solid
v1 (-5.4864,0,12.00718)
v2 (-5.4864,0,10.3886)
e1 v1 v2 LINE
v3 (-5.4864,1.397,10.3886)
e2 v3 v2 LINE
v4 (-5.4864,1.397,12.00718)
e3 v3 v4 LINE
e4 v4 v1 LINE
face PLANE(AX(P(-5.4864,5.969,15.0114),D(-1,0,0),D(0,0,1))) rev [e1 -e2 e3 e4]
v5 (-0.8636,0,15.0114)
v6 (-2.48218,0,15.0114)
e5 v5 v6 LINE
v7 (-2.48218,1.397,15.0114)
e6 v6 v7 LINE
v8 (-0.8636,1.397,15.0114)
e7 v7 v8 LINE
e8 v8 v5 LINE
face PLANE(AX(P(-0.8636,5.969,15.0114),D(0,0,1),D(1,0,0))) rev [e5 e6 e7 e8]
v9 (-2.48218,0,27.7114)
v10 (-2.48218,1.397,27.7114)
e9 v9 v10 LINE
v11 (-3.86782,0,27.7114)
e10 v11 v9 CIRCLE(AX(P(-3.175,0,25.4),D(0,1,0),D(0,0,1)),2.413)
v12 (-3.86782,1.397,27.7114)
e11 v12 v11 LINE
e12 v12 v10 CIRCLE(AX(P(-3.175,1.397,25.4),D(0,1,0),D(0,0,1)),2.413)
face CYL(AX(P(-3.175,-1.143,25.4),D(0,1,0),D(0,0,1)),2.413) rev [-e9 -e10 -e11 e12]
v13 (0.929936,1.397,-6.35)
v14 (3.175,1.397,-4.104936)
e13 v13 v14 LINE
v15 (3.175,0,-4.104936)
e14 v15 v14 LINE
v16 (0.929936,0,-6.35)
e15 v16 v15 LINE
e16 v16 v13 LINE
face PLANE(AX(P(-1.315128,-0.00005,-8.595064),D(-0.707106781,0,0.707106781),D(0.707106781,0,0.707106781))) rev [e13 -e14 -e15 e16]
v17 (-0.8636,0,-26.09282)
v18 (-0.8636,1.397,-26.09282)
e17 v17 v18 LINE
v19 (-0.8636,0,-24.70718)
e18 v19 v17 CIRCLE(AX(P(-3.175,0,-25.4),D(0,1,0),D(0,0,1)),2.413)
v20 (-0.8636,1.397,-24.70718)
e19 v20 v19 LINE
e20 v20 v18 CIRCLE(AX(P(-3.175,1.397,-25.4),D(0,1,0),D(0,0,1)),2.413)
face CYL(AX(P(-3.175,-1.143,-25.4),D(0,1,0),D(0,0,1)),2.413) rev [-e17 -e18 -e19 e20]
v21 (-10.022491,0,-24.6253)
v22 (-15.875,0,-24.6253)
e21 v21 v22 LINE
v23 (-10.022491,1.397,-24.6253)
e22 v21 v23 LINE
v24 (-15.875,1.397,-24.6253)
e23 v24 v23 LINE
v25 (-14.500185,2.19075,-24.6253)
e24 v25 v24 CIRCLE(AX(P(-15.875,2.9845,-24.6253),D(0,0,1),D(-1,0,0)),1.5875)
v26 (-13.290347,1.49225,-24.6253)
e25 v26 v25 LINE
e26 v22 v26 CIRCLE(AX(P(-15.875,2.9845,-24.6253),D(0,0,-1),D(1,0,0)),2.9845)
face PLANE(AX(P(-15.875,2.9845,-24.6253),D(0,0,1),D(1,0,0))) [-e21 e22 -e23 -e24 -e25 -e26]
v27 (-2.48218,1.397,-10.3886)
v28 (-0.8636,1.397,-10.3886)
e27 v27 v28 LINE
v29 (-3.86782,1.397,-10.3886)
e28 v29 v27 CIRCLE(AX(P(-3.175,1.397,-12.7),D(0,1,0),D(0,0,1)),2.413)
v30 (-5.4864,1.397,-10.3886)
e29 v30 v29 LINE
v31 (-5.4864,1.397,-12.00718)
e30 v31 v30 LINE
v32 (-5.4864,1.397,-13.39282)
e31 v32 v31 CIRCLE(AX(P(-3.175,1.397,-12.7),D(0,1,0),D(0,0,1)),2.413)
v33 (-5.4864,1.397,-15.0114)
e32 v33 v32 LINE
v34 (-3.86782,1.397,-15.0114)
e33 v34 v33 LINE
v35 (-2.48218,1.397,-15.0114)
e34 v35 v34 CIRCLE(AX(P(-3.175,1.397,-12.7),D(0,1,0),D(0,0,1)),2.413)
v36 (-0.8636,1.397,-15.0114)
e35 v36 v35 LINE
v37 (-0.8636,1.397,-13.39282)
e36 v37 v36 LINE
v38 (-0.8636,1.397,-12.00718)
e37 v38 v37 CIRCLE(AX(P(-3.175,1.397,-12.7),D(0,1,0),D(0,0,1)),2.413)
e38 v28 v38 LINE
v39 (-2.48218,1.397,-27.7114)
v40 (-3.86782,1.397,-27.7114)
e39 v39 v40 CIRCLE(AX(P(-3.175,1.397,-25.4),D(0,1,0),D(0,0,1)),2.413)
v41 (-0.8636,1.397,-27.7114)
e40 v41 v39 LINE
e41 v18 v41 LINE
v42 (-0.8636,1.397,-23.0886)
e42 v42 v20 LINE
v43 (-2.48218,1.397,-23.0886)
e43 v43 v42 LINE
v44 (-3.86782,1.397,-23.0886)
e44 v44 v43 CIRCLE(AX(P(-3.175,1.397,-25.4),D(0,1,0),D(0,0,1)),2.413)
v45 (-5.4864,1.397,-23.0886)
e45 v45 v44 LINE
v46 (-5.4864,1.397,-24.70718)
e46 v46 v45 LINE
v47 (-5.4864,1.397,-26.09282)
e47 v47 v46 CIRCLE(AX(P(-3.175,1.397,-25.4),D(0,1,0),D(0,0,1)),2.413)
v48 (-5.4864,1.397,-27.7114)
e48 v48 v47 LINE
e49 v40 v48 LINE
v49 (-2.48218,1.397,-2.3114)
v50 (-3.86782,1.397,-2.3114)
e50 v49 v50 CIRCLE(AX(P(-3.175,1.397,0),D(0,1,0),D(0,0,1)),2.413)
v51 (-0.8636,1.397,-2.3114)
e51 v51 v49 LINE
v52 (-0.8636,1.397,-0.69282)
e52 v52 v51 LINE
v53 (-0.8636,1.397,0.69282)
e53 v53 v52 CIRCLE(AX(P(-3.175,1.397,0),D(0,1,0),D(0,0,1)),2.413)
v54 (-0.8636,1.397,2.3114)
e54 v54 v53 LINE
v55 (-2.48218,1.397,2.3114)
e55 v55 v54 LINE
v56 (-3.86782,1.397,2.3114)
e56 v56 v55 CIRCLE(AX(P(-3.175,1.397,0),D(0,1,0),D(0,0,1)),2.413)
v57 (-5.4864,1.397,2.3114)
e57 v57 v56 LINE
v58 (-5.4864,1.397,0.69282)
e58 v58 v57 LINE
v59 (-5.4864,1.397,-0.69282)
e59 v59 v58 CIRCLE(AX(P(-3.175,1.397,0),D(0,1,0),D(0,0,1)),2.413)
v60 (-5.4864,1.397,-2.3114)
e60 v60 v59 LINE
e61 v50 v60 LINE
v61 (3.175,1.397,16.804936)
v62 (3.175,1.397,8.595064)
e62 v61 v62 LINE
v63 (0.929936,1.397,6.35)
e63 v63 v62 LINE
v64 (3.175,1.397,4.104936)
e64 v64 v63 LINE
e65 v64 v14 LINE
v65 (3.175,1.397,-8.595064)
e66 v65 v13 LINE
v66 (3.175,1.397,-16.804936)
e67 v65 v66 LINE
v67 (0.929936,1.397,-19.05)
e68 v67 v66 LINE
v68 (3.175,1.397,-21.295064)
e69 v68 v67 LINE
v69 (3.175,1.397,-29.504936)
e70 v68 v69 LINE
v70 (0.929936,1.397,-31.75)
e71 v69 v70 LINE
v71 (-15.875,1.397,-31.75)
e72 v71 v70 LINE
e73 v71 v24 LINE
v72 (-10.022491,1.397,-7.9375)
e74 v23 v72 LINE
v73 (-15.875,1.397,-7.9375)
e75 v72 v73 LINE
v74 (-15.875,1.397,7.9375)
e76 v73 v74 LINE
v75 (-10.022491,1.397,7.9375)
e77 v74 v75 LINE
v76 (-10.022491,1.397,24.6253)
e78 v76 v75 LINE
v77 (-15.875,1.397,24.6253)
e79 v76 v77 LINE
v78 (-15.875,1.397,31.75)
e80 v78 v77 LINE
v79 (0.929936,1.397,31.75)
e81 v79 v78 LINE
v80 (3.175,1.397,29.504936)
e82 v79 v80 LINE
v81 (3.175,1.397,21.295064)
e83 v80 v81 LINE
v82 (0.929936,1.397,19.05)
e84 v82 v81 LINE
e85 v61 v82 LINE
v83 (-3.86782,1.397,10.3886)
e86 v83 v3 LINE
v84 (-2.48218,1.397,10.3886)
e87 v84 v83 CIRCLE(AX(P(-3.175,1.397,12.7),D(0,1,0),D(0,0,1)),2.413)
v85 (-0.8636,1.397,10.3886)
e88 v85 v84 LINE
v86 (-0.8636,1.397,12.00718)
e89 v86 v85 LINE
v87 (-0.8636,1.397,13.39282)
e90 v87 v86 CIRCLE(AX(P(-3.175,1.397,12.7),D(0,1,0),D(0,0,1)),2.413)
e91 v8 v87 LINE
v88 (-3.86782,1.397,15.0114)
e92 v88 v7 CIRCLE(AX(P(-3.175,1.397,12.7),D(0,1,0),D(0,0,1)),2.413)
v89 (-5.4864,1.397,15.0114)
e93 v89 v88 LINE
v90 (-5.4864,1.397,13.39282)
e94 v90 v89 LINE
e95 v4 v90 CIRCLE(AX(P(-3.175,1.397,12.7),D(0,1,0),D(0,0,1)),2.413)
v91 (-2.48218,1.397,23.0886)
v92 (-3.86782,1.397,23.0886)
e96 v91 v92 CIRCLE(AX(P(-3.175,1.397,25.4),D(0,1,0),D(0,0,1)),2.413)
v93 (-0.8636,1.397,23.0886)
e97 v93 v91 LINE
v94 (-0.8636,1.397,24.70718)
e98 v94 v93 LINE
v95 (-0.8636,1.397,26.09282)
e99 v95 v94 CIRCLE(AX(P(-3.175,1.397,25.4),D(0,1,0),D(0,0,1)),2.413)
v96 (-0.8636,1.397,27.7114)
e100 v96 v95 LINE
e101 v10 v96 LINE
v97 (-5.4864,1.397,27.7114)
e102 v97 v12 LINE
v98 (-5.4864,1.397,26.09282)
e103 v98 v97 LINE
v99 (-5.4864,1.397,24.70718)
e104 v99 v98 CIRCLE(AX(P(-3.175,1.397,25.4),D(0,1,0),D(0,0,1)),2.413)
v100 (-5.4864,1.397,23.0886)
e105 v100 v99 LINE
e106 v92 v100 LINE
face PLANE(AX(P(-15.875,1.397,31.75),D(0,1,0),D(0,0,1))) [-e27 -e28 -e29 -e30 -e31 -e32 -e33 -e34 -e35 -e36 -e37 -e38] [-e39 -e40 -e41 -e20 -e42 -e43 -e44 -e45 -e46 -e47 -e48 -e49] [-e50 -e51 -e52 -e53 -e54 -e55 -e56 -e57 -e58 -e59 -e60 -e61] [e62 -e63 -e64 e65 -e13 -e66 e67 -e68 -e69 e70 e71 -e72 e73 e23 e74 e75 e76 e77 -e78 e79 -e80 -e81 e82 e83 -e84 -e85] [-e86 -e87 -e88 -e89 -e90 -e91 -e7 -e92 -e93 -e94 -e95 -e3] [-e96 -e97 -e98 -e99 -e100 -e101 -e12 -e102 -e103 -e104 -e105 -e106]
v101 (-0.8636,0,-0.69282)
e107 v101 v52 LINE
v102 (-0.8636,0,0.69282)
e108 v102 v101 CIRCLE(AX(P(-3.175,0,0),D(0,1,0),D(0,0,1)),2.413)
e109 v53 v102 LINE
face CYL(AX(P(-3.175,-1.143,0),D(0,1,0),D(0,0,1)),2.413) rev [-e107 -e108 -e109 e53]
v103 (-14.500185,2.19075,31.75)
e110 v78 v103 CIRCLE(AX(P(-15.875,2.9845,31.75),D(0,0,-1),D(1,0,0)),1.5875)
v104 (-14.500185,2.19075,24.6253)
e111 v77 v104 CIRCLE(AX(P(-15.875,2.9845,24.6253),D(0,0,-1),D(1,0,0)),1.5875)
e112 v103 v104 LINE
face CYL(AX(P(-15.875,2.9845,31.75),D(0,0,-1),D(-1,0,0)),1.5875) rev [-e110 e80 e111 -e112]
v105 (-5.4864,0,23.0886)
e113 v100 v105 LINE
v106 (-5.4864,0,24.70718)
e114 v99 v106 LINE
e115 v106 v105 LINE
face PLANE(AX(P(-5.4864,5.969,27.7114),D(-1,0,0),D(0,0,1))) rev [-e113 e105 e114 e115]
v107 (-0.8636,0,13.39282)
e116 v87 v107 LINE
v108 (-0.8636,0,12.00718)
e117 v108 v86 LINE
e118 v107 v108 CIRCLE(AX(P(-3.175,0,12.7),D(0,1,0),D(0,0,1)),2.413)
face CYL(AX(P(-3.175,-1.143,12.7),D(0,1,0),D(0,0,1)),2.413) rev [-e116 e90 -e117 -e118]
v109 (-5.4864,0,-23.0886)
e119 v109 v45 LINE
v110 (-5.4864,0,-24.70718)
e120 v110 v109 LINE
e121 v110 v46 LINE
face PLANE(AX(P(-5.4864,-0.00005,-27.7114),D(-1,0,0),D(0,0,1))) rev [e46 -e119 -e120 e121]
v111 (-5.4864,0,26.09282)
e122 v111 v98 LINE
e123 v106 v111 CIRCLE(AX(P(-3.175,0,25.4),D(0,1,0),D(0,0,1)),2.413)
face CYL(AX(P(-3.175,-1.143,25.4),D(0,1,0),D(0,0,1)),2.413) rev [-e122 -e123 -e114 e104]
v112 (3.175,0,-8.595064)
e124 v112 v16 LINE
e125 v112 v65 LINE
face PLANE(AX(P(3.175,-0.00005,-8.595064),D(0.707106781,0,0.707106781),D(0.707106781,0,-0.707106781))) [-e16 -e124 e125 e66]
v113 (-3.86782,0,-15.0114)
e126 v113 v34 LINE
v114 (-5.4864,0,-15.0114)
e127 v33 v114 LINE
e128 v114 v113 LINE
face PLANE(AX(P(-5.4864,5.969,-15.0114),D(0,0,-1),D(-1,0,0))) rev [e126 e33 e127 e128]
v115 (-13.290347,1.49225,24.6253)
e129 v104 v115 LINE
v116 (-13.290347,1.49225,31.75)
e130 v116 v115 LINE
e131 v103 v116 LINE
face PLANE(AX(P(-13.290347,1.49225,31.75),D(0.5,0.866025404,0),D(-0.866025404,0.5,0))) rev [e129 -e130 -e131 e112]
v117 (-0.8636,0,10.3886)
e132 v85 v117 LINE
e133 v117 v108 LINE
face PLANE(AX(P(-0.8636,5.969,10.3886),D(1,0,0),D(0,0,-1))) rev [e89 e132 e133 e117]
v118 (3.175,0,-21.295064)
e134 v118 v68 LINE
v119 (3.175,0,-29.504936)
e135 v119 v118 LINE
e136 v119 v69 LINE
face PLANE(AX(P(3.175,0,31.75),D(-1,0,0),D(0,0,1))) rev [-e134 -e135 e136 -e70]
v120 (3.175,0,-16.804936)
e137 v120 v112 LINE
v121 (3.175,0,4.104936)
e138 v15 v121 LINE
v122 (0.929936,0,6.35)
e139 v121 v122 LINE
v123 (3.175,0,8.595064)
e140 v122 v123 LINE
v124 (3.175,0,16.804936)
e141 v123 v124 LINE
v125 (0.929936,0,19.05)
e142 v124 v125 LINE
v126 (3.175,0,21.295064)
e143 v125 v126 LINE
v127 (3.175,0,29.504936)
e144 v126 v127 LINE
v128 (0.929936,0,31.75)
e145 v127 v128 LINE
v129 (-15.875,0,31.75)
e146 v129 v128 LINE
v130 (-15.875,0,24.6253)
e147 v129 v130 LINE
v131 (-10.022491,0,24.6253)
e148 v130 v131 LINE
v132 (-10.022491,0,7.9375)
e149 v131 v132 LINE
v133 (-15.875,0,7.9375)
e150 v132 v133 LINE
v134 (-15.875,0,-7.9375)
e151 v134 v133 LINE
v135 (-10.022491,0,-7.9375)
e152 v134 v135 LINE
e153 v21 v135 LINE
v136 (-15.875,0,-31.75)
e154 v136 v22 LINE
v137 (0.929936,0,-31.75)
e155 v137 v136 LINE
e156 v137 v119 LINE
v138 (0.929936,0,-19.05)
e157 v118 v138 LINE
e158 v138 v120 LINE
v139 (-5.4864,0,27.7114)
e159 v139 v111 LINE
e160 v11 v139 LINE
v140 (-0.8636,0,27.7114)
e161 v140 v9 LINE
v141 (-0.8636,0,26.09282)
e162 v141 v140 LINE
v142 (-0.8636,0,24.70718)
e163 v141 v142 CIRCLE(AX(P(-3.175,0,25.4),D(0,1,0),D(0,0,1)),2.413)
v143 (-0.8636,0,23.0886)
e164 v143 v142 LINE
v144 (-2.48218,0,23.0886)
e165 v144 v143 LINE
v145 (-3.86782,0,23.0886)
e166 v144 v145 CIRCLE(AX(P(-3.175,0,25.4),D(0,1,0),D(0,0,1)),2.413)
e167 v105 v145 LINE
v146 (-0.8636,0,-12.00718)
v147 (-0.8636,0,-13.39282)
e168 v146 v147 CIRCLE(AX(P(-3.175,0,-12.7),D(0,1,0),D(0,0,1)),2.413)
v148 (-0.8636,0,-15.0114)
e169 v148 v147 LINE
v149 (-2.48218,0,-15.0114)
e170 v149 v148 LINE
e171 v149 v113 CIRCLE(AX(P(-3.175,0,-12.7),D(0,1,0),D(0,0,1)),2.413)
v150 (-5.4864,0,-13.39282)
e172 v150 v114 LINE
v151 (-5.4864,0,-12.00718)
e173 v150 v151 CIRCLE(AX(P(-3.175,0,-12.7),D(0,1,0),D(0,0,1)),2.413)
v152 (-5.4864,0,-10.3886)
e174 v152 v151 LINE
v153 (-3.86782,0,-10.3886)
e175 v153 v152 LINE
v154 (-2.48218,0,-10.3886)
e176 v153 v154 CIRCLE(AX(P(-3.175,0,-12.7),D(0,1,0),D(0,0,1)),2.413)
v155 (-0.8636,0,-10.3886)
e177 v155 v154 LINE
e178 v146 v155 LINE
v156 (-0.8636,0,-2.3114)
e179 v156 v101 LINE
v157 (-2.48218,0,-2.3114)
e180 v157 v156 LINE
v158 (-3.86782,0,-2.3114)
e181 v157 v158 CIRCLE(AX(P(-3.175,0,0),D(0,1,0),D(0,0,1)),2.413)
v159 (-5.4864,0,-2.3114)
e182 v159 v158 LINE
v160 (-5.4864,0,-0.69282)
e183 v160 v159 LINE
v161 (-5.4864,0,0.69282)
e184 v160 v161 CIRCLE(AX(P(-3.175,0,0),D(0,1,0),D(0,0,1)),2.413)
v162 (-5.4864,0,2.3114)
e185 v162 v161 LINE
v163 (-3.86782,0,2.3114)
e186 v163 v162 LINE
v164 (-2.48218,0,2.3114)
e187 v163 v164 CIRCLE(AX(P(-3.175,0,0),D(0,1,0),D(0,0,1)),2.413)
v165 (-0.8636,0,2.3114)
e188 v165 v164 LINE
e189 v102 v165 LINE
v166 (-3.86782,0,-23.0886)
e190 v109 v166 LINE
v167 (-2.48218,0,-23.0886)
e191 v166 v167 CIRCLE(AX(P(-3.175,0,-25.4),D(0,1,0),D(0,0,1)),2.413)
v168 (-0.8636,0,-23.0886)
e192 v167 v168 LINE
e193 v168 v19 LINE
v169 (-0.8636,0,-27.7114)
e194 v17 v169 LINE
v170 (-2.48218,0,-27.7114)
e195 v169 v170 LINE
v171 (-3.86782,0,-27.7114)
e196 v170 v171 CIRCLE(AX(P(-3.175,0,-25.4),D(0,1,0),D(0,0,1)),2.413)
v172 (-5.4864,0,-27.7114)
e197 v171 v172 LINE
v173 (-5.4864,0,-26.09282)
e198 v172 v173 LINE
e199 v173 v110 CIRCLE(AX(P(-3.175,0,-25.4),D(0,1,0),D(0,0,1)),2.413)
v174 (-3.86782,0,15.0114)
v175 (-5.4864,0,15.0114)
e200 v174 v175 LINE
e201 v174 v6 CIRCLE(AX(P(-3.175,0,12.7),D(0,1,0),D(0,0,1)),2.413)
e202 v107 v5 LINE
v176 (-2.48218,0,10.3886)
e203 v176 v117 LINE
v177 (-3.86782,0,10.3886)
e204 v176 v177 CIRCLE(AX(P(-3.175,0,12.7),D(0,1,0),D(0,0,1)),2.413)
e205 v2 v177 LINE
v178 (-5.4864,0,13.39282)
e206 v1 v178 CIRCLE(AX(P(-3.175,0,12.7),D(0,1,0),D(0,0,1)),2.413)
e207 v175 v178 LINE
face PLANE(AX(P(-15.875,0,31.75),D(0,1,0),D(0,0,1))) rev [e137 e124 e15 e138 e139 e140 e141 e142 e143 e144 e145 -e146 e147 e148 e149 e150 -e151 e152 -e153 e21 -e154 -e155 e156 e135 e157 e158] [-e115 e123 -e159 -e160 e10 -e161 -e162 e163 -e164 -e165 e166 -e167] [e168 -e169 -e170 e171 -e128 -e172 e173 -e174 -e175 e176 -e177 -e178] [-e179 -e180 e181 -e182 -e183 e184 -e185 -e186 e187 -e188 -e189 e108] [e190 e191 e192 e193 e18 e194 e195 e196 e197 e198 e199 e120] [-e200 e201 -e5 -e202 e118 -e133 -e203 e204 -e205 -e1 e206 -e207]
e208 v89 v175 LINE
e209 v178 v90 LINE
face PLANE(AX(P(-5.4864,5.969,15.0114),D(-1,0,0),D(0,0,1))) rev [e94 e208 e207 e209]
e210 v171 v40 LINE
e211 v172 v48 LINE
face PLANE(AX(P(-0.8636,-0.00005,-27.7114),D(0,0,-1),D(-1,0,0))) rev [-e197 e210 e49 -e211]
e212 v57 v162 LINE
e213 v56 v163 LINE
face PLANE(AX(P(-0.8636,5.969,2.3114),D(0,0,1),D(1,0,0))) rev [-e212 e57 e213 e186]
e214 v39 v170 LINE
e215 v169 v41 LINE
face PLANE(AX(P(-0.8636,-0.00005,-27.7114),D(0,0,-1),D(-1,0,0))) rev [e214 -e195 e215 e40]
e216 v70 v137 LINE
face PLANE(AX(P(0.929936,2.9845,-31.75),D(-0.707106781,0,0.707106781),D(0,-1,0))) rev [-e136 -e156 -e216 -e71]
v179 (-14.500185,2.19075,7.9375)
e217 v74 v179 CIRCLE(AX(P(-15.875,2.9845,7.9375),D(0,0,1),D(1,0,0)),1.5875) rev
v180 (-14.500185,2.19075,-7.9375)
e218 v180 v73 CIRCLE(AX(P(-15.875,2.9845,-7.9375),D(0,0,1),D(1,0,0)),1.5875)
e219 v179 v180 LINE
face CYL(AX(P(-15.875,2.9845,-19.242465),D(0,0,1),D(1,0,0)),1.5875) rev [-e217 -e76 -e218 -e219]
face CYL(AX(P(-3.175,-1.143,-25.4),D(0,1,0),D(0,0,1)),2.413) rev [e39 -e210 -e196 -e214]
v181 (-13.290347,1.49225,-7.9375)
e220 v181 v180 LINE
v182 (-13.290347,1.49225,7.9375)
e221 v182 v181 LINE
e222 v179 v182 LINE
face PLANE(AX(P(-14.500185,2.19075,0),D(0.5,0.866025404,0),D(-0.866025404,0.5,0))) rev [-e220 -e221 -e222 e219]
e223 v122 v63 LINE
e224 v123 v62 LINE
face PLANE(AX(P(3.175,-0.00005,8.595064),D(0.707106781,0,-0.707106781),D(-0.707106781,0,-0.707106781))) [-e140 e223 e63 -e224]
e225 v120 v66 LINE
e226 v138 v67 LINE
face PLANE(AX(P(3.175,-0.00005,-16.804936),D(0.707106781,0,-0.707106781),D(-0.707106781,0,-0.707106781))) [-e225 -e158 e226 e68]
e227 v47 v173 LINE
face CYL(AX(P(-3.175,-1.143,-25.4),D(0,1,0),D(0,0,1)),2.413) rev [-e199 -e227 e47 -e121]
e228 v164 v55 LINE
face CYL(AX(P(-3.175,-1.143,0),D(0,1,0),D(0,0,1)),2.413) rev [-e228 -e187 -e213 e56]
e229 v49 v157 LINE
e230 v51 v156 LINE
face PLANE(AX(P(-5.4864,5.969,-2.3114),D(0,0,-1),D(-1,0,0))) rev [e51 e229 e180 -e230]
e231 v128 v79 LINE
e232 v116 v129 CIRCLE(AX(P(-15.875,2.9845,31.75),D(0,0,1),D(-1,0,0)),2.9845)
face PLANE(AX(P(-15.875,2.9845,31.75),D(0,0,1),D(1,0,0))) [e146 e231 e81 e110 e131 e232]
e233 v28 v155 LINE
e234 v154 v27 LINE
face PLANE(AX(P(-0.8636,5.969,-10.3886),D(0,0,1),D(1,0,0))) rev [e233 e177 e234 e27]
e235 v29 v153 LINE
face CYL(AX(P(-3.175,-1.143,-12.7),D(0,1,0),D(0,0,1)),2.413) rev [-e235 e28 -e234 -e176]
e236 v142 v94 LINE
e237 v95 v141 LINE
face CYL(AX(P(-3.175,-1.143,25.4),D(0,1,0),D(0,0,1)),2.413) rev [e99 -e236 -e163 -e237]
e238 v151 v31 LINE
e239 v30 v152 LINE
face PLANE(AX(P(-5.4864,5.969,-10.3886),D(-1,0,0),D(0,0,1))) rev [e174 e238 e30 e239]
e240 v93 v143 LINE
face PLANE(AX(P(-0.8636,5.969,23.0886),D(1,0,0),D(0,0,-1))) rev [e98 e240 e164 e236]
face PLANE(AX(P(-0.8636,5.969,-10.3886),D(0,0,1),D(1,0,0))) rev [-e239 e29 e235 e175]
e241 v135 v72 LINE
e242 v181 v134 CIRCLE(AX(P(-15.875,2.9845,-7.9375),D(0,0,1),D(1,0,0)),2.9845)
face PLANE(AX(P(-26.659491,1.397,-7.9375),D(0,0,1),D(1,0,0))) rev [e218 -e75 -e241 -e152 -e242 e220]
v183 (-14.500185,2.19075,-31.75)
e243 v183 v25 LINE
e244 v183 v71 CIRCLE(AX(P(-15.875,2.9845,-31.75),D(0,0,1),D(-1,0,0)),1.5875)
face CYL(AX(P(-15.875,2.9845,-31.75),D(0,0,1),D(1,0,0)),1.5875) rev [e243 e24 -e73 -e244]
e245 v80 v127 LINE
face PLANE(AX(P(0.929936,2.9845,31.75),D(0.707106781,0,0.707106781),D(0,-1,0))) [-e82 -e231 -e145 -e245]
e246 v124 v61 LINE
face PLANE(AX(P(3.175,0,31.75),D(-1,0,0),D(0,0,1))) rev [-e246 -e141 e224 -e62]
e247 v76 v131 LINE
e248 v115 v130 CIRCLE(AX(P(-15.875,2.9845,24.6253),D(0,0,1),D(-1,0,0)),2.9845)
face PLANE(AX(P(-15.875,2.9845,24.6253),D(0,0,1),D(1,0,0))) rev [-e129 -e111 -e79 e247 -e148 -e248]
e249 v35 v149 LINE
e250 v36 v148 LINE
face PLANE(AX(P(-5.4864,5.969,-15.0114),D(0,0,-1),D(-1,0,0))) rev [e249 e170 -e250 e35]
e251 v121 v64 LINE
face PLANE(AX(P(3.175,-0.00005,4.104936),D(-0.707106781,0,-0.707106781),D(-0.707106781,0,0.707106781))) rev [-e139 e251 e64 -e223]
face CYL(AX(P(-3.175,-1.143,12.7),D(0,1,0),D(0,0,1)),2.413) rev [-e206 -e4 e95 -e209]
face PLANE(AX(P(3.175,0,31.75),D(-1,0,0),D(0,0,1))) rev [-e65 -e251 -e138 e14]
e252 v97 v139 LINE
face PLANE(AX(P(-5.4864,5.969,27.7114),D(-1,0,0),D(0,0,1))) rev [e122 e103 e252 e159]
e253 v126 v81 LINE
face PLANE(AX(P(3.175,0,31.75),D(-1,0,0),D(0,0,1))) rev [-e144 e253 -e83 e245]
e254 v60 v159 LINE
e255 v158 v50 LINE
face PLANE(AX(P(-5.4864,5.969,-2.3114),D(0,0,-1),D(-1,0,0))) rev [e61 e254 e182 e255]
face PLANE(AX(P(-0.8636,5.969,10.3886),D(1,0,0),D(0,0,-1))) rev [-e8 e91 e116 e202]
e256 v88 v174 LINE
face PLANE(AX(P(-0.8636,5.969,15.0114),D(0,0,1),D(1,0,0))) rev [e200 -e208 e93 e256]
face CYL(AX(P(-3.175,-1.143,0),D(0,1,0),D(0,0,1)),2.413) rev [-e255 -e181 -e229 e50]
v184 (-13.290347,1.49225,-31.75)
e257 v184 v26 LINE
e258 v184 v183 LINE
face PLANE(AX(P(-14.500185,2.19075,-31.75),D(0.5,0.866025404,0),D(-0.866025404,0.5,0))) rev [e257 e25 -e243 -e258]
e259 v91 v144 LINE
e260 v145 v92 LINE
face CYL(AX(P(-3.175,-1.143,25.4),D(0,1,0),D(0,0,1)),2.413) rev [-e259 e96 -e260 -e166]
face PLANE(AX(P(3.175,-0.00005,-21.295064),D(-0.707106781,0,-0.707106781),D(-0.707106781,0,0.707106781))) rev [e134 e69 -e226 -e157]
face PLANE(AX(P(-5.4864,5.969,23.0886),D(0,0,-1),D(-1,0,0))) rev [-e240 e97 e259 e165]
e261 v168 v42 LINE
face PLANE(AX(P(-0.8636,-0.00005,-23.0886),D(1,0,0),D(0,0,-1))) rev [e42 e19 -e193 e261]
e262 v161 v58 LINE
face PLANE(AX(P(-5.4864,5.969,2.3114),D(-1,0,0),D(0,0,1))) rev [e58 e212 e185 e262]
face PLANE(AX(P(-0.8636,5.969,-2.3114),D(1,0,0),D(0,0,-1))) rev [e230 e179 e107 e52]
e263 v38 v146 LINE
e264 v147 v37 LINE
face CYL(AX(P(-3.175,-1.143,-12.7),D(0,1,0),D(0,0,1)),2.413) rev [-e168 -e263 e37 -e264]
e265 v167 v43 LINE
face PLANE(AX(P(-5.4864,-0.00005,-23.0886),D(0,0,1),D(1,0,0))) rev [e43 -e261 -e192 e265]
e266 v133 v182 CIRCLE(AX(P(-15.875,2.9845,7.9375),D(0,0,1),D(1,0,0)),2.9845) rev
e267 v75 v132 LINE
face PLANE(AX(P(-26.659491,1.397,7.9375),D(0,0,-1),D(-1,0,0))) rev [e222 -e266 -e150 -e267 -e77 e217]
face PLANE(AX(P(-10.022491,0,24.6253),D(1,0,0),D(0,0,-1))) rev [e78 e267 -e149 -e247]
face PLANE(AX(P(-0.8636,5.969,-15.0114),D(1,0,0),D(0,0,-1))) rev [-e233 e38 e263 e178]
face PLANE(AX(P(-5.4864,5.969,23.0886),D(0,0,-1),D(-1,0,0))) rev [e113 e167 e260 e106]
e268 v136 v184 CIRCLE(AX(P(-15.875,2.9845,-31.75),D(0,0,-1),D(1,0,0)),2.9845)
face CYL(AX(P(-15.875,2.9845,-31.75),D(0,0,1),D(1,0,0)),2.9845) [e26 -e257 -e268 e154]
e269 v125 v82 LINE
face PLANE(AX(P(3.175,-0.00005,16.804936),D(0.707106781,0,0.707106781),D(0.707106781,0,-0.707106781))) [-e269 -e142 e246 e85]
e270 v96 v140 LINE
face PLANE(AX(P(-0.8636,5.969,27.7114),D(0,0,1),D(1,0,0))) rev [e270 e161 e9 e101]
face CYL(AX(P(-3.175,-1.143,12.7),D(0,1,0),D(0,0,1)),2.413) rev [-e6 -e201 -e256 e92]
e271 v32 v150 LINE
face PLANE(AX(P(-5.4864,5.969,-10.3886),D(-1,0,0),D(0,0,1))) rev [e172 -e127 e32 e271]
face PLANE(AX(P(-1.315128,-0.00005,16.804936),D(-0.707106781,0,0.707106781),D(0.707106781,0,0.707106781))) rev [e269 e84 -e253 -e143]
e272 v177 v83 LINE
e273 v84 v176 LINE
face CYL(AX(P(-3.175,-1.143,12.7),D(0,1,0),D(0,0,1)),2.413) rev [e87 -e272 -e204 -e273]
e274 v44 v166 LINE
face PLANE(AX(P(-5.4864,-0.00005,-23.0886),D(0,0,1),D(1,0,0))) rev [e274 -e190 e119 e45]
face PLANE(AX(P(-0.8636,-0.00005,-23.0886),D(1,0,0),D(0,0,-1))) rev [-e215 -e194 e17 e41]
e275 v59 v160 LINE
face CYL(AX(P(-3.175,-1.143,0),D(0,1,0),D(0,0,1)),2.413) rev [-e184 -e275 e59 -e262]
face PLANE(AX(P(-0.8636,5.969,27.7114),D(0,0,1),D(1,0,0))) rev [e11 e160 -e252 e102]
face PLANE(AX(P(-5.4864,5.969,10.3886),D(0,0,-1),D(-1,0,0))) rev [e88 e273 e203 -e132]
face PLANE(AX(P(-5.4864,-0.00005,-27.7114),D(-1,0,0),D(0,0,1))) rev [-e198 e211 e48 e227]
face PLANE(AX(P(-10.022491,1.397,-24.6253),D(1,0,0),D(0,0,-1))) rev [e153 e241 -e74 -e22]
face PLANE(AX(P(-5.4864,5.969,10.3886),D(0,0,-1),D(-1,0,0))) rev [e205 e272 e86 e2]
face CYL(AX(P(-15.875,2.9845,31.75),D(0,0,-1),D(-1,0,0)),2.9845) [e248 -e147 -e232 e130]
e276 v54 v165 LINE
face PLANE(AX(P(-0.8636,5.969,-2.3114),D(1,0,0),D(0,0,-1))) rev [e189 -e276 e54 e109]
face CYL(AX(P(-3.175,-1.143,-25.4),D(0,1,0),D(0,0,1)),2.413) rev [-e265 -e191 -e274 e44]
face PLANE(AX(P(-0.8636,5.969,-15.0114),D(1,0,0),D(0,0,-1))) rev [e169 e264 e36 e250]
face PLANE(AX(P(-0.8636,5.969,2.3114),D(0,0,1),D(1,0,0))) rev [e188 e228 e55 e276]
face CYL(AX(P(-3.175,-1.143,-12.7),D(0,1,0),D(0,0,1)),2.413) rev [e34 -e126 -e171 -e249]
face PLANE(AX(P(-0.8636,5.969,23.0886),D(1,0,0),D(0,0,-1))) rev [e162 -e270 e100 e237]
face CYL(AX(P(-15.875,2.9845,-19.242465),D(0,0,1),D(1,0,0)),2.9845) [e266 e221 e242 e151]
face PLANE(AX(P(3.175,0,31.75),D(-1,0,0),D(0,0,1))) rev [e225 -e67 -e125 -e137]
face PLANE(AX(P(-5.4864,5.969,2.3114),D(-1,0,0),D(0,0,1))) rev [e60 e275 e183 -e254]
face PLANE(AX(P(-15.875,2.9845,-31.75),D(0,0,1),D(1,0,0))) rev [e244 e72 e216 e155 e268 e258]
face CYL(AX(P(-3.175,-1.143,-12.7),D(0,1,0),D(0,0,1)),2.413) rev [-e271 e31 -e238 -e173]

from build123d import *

# Parameters (mm, degrees)
BOSS_EXTRUDE1_START       = -15.875
BOSS_EXTRUDE1_DEPTH       = 15.875
BOSS_EXTRUDE1_2_OUTLINE_W = 13.197490677
BOSS_EXTRUDE1_2_OUTLINE_H = 1.397
BOSS_EXTRUDE1_2_DEPTH     = 16.6878
SKETCH2_W                 = 13.197490677
SKETCH2_H                 = 1.397
BOSS_EXTRUDE2_DEPTH       = 16.6878
BOSS_EXTRUDE3_START       = 7.1247
BOSS_EXTRUDE3_DEPTH       = 7.1247
BOSS_EXTRUDE4_DEPTH       = 7.1247
CUT_EXTRUDE1_DEPTH        = 38.210837465
CUT_EXTRUDE2_DEPTH        = 38.210837465
CUT_EXTRUDE3_DEPTH        = 38.210837465
CUT_EXTRUDE4_DEPTH        = 38.210837465
SKETCH9_W                 = 4.6228
SKETCH9_H                 = 4.6228
CUT_EXTRUDE5_DEPTH        = 38.408183622
SKETCH10_W                = 4.6228
SKETCH10_H                = 4.6228
CUT_EXTRUDE6_DEPTH        = 38.408183622
SKETCH11_W                = 4.6228
SKETCH11_H                = 4.6228
CUT_EXTRUDE7_DEPTH        = 38.408183622
SKETCH12_W                = 4.6228
SKETCH12_H                = 4.6228
CUT_EXTRUDE8_DEPTH        = 38.408183622
SKETCH13_W                = 4.6228
SKETCH13_H                = 4.6228
CUT_EXTRUDE9_DEPTH        = 38.210837465
DRAFT1_DEPTH              = 1.397
DRAFT2_DEPTH              = 1.397
CHAMFER1_SIZE             = 2.24506403
SKETCH14_R                = 2.413
CUT_EXTRUDE10_DEPTH       = 2.54
LPATTERN1_COUNT           = 5
LPATTERN1_PITCH           = 12.7


with BuildPart() as part:
    # Boss-Extrude1: read off the stored shape, not the designer's step
    # Boss-Extrude1 outline → Boss-Extrude1 (new body)
    with BuildSketch(Plane.XY.offset(7.9375).offset(BOSS_EXTRUDE1_START)):
        with BuildLine():
            Line((-14.500184662, 2.190749994), (-13.290347173, 1.492249994))
            ThreePointArc((-13.290347173, 1.492249994), (-17.367250005, 5.569152828), (-15.875, -1.1e-08))
            Line((-15.875, -1.1e-08), (3.175, 0))
            Line((3.175, 0), (3.175, 1.397))
            Line((3.175, 1.397), (-15.875, 1.396999989))
            ThreePointArc((-15.875, 1.396999989), (-16.668750005, 4.359315339), (-14.500184662, 2.190749994))
        make_face()
    extrude(amount=BOSS_EXTRUDE1_DEPTH)

    # Boss-Extrude1 2 outline → Boss-Extrude1 2 (add)
    with BuildSketch(Plane.XY.offset(7.9375)):
        with Locations((-3.423745338, 0.6985)):
            Rectangle(BOSS_EXTRUDE1_2_OUTLINE_W, BOSS_EXTRUDE1_2_OUTLINE_H)
    extrude(amount=BOSS_EXTRUDE1_2_DEPTH)

    # Sketch2 → Boss-Extrude2 (add)
    with BuildSketch(Plane(origin=(0, 0, -7.9375), x_dir=(-1, 0, 0), z_dir=(0, 0, -1))):
        with Locations((3.423745338, 0.6985)):
            Rectangle(SKETCH2_W, SKETCH2_H)
    extrude(amount=BOSS_EXTRUDE2_DEPTH)

    # Sketch3 → Boss-Extrude3 (add)
    with BuildSketch(Plane(origin=(0, 0, -24.6253), x_dir=(-1, 0, 0), z_dir=(0, 0, -1)).offset(BOSS_EXTRUDE3_START)):
        with BuildLine():
            Line((15.875, 0), (-3.175, 0))
            Line((-3.175, 0), (-3.175, 1.397))
            Line((-3.175, 1.397), (15.875, 1.397))
            ThreePointArc((15.875, 1.397), (16.668750004, 4.359315344), (14.500184664, 2.190750004))
            Line((14.500184664, 2.190750004), (13.290347175, 1.492250004))
            ThreePointArc((13.290347175, 1.492250004), (17.367250004, 5.569152833), (15.875, 0))
        make_face()
    extrude(amount=-BOSS_EXTRUDE3_DEPTH)

    # Sketch4 → Boss-Extrude4 (add)
    with BuildSketch(Plane.XY.offset(24.6253)):
        with BuildLine():
            Line((-15.875, 1.396999994), (3.175, 1.396999994))
            Line((3.175, 1.396999994), (3.175, -6e-09))
            Line((3.175, -6e-09), (-15.875, -6e-09))
            ThreePointArc((-15.875, -6e-09), (-17.367250004, 5.569152828), (-13.290347175, 1.492249999))
            Line((-13.290347175, 1.492249999), (-14.500184664, 2.190749999))
            ThreePointArc((-14.500184664, 2.190749999), (-16.668750004, 4.359315339), (-15.875, 1.396999994))
        make_face()
    extrude(amount=BOSS_EXTRUDE4_DEPTH)

    # Sketch5 → Cut-Extrude1 (cut, through all)
    with BuildSketch(Plane(origin=(0, 1.397, 0), x_dir=(-1, 0, 0), z_dir=(0, 1, 0))):
        Polygon((-3.175, -16.80493597), (-3.175, -21.29506403), (1.315128061, -16.80493597), align=None)
    extrude(amount=-CUT_EXTRUDE1_DEPTH, mode=Mode.SUBTRACT)

    # Sketch6 → Cut-Extrude2 (cut, through all)
    with BuildSketch(Plane(origin=(0, 1.397, 0), x_dir=(-1, 0, 0), z_dir=(0, 1, 0))):
        Polygon((-3.175, -4.10493597), (-3.175, -8.59506403), (1.315128061, -8.59506403), align=None)
    extrude(amount=-CUT_EXTRUDE2_DEPTH, mode=Mode.SUBTRACT)

    # Sketch7 → Cut-Extrude3 (cut, through all)
    with BuildSketch(Plane(origin=(0, 1.397, 0), x_dir=(-1, 0, 0), z_dir=(0, 1, 0))):
        Polygon((-3.175, 8.59506403), (-3.175, 4.10493597), (1.315128061, 8.59506403), align=None)
    extrude(amount=-CUT_EXTRUDE3_DEPTH, mode=Mode.SUBTRACT)

    # Sketch8 → Cut-Extrude4 (cut, through all)
    with BuildSketch(Plane(origin=(0, 1.397, 0), x_dir=(-1, 0, 0), z_dir=(0, 1, 0))):
        Polygon((-3.175, 21.29506403), (-3.175, 16.80493597), (1.315128061, 16.80493597), align=None)
    extrude(amount=-CUT_EXTRUDE4_DEPTH, mode=Mode.SUBTRACT)

    # Sketch9 → Cut-Extrude5 (cut, through all)
    with BuildSketch(Plane.XZ):
        with Locations((-3.175, 25.4)):
            Rectangle(SKETCH9_W, SKETCH9_H)
    extrude(amount=-CUT_EXTRUDE5_DEPTH, mode=Mode.SUBTRACT)

    # Sketch10 → Cut-Extrude6 (cut, through all)
    with BuildSketch(Plane.XZ):
        with Locations((-3.175, 12.7)):
            Rectangle(SKETCH10_W, SKETCH10_H)
    extrude(amount=-CUT_EXTRUDE6_DEPTH, mode=Mode.SUBTRACT)

    # Sketch11 → Cut-Extrude7 (cut, through all)
    with BuildSketch(Plane.XZ):
        with Locations((-3.175, 0)):
            Rectangle(SKETCH11_W, SKETCH11_H)
    extrude(amount=-CUT_EXTRUDE7_DEPTH, mode=Mode.SUBTRACT)

    # Sketch12 → Cut-Extrude8 (cut, through all)
    with BuildSketch(Plane.XZ):
        with Locations((-3.175, -12.7)):
            Rectangle(SKETCH12_W, SKETCH12_H)
    extrude(amount=-CUT_EXTRUDE8_DEPTH, mode=Mode.SUBTRACT)

    # Sketch13 → Cut-Extrude9 (cut, through all)
    with BuildSketch(Plane(origin=(0, 1.397, 0), x_dir=(-1, 0, 0), z_dir=(0, 1, 0))):
        with Locations((3.175, -25.4)):
            Rectangle(SKETCH13_W, SKETCH13_H)
    extrude(amount=-CUT_EXTRUDE9_DEPTH, mode=Mode.SUBTRACT)

    # Draft1: read off the stored shape, not the designer's step
    # Draft1 outline → Draft1 (add)
    with BuildSketch(Plane(origin=(0, 0, 0), x_dir=(1, 0, 0), z_dir=(0, 1, 0))):
        Polygon((-1.315128061, 16.80493597), (3.175, 16.80493597), (0.92993597, 19.05), align=None)
        Polygon((-1.315128061, 8.59506403), (0.92993597, 6.35), (3.175, 8.59506403), align=None)
    extrude(amount=DRAFT1_DEPTH)

    # Draft2: read off the stored shape, not the designer's step
    # Draft2 outline → Draft2 (add)
    with BuildSketch(Plane(origin=(0, 0, 0), x_dir=(1, 0, 0), z_dir=(0, 1, 0))):
        Polygon((-1.315128061, -8.59506403), (3.175, -8.59506403), (0.92993597, -6.35), align=None)
        Polygon((-1.315128061, -16.80493597), (0.92993597, -19.05), (3.175, -16.80493597), align=None)
    extrude(amount=DRAFT2_DEPTH)

    # Chamfer1
    chamfer1_edges = [part.edges().sort_by_distance(p)[0] for p in [
        (3.175, 0.6985, -31.75),
        (3.175, 0.698499994, 31.75),
    ]]
    chamfer(chamfer1_edges, length=CHAMFER1_SIZE)

    # Sketch14 → Cut-Extrude10 (cut)
    with BuildSketch(Plane(origin=(0, 1.397, 0), x_dir=(1, 0, 0), z_dir=(0, 1, 0))):
        with Locations((-3.175, -25.4)):
            Circle(SKETCH14_R)
    cut_extrude10 = extrude(amount=-CUT_EXTRUDE10_DEPTH, mode=Mode.SUBTRACT)

    # LPattern1: Cut-Extrude10 ×5
    with Locations(*[(0, 0, -i * LPATTERN1_PITCH) for i in range(1, LPATTERN1_COUNT)]):
        add(cut_extrude10, mode=Mode.SUBTRACT)


solid = part.part
